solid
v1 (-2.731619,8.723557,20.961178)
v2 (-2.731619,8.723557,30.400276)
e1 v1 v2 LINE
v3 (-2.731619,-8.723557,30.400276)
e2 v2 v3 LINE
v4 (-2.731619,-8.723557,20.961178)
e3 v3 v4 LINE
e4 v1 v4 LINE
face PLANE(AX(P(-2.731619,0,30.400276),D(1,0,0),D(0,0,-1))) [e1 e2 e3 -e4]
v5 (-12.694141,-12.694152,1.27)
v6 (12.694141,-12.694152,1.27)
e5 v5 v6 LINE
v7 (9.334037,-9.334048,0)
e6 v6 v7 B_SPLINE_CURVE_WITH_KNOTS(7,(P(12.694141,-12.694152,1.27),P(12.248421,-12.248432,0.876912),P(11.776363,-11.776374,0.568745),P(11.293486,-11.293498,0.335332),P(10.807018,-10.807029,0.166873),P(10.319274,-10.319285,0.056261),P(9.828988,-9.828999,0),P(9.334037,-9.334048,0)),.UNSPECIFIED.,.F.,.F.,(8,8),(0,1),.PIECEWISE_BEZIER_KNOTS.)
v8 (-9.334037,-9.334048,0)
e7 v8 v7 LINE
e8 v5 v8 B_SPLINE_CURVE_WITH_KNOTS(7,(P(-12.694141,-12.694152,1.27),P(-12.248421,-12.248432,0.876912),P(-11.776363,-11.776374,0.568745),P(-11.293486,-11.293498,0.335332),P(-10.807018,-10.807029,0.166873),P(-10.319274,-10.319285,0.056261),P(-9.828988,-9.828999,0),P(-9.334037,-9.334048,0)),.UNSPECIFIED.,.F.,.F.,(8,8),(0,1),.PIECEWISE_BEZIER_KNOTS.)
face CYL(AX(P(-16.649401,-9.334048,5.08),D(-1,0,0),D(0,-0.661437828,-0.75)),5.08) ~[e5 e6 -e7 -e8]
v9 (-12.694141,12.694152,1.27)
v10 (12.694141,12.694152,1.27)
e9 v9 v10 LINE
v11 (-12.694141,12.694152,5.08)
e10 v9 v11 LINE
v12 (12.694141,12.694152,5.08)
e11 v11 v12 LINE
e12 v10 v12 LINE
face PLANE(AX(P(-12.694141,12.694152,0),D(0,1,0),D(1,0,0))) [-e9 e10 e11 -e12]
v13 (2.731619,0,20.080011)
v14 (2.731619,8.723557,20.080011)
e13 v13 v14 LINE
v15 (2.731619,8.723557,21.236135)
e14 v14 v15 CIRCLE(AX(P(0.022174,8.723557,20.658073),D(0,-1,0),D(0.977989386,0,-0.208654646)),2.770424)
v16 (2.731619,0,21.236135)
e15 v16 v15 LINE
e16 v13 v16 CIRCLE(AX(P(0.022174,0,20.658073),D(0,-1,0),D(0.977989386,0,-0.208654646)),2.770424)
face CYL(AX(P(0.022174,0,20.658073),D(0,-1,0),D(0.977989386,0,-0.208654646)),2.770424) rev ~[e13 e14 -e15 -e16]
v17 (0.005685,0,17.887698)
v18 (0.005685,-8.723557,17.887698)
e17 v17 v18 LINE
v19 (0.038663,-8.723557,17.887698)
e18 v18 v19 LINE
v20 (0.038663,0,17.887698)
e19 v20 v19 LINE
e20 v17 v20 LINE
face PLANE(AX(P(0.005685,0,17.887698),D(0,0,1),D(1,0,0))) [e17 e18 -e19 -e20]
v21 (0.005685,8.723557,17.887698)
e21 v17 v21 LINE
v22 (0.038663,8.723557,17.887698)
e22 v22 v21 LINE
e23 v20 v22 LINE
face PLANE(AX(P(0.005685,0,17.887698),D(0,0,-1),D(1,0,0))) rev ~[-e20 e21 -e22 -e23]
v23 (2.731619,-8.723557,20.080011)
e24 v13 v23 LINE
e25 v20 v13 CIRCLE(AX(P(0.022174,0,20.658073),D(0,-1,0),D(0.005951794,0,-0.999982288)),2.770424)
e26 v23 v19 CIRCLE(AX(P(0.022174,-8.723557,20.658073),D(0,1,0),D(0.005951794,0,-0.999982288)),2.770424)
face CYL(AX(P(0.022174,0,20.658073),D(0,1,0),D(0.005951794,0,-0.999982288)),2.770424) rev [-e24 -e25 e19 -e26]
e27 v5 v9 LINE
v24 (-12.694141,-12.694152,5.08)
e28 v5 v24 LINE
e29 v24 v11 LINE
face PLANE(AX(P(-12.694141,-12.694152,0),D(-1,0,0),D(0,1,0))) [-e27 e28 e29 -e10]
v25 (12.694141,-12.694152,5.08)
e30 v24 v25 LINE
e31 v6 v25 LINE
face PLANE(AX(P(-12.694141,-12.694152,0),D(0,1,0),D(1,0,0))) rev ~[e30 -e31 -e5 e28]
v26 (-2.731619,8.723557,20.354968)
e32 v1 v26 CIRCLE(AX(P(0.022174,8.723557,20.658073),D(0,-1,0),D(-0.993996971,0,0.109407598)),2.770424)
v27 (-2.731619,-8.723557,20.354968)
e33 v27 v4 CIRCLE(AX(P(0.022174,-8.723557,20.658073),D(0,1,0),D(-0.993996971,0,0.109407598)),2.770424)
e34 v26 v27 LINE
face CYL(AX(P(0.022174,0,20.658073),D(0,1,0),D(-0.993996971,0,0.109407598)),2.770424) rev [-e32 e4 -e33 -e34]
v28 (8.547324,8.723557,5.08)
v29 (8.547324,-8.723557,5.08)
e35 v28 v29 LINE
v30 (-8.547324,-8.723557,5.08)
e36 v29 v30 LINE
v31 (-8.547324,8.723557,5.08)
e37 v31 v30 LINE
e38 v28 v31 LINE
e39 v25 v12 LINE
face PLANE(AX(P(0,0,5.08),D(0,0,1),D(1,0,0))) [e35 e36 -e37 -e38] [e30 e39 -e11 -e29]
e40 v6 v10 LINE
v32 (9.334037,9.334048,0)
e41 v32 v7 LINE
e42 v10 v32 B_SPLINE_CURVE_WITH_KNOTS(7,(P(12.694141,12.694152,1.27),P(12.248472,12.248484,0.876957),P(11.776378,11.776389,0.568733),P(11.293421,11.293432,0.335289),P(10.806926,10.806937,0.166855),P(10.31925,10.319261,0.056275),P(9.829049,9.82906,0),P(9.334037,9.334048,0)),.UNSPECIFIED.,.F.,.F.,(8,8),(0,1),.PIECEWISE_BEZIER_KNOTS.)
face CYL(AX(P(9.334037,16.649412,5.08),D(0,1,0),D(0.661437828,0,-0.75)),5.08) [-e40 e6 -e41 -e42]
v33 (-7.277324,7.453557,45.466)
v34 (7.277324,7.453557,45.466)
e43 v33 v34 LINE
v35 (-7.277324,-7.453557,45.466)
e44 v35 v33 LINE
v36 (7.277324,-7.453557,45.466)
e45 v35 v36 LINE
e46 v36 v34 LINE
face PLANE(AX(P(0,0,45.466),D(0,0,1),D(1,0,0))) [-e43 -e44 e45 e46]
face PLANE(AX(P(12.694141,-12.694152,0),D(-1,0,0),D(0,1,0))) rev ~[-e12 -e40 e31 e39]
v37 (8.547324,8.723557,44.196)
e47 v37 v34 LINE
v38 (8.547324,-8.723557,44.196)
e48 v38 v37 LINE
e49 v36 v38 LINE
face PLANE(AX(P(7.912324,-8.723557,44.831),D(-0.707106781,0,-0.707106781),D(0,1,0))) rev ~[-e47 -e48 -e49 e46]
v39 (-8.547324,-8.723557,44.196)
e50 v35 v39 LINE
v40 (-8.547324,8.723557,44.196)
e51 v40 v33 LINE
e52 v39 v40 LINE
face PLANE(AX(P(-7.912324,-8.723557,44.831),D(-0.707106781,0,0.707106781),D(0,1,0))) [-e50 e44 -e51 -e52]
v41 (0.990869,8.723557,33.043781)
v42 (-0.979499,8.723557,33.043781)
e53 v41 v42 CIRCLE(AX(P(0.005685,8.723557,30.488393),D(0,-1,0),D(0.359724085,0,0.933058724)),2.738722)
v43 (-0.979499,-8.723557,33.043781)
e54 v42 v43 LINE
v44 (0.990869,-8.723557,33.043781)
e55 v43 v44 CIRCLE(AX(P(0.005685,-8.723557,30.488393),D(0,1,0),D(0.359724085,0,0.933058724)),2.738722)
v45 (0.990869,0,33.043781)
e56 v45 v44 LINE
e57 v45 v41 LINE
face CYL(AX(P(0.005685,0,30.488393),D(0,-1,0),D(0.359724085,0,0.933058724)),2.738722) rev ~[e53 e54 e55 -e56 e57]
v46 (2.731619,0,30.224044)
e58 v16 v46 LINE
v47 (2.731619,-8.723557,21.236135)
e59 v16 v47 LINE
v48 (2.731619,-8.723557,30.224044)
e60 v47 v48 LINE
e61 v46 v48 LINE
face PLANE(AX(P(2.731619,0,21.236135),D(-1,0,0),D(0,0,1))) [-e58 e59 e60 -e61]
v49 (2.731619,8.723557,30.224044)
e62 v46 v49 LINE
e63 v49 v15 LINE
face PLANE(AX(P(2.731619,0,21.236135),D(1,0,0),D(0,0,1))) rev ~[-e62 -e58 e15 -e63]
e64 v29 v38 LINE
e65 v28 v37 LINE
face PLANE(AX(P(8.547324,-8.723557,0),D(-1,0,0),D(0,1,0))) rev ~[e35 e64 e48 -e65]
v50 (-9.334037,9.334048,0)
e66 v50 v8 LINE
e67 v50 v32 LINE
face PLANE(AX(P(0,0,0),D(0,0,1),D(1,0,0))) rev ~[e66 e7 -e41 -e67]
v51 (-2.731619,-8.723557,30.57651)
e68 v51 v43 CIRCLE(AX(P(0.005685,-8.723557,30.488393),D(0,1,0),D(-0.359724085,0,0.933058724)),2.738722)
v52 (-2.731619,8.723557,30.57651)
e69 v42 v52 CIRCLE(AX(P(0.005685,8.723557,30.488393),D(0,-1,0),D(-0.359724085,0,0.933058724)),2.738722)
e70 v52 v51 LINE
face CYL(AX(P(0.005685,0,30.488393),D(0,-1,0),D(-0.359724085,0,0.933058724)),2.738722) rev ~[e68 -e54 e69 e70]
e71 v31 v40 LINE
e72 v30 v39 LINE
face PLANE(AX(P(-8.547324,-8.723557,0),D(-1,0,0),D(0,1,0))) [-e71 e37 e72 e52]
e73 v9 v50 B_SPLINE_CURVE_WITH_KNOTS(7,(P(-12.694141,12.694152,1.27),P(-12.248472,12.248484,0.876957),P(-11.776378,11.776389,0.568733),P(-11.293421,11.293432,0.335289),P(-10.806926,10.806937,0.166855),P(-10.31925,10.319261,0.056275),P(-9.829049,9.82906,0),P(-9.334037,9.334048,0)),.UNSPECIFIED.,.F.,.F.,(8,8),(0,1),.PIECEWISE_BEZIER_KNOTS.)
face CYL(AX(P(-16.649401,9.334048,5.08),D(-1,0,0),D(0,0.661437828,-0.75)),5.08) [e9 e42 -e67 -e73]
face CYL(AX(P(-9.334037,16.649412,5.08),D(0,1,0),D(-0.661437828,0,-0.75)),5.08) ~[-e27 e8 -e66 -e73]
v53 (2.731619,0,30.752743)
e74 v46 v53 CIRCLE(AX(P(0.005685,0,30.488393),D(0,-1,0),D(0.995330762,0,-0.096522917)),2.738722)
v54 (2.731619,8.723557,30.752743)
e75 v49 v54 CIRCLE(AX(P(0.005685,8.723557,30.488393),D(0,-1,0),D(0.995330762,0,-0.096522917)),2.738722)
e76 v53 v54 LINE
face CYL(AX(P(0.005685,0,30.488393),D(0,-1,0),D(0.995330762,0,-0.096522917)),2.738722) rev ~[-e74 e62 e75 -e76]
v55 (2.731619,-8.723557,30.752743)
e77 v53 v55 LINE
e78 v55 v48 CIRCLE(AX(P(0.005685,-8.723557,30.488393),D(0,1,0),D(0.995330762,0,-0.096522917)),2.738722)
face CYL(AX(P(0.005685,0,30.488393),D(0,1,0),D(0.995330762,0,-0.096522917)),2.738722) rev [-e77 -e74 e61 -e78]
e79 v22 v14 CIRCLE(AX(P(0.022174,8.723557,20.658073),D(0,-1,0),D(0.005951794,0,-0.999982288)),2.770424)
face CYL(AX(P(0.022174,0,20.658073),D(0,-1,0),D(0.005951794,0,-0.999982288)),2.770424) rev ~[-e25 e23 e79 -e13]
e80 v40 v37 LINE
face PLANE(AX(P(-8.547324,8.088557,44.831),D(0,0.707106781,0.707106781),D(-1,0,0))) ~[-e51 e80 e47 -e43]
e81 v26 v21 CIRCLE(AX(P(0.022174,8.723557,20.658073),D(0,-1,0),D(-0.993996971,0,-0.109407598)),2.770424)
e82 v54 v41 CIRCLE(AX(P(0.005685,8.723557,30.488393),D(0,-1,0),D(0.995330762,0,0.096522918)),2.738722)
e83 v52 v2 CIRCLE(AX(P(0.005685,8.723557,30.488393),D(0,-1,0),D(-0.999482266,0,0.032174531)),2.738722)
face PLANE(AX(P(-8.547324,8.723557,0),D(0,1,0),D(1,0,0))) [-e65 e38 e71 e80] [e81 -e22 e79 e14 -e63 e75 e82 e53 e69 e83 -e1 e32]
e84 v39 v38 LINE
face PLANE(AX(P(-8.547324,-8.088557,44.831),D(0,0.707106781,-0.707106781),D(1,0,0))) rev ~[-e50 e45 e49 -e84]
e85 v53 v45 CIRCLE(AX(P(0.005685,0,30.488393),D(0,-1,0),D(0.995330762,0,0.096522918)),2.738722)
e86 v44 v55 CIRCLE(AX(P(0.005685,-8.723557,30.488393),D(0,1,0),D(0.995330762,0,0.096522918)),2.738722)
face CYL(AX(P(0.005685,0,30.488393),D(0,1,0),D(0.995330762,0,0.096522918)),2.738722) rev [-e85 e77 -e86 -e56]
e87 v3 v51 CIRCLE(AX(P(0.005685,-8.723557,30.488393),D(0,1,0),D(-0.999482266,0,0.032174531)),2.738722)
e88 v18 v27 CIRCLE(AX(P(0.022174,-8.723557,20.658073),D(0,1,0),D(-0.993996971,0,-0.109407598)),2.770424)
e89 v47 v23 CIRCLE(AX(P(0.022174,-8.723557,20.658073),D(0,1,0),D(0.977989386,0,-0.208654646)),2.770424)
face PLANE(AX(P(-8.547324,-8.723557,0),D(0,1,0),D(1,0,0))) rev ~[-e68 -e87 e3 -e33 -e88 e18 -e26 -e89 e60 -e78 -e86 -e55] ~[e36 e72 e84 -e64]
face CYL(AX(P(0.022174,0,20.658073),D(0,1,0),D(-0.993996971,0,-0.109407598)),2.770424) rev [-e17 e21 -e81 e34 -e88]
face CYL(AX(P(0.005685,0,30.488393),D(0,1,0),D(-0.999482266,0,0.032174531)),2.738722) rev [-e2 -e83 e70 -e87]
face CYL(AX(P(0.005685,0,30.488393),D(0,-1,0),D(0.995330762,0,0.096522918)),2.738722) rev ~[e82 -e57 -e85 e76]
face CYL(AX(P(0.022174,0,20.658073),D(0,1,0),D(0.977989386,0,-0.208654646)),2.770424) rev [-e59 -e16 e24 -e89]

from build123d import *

# Parameters (mm, degrees)
F0_W        = 25.3882817924
F0_H        = 25.3883041441
F1_DEPTH    = 5.08
F2_W        = 17.0946475118
F2_H        = 17.4471139908
F3_DEPTH    = 45.466
F5_DEPTH    = 25.4
F6_DEPTH    = 25.4
F7_SIZE     = 1.27
F8_SIZE     = 1.27
F9_T1_DEPTH = 33.2988026177
F9_T3_DEPTH = 33.2988249694


# Not quite as in the source:
# - a fillet or chamfer that OpenCascade refuses, or shapes differently, is made with other operations: its cross-section is extruded or revolved along the edge and cut away or added


with BuildPart() as f1:
    # F0 (on Top) → F1 (new body)
    with BuildSketch(Plane.XY):
        Rectangle(F0_W, F0_H)
    extrude(amount=F1_DEPTH)

    # F2 (on Top) → F3 (join)
    with BuildSketch(Plane.XY):
        Rectangle(F2_W, F2_H)
    extrude(amount=F3_DEPTH)

    # F4 (on Front) → F5 (cut)
    with BuildSketch(Plane.XZ):
        with BuildLine():
            ThreePointArc((-2.7316187043, 20.3549675643), (-1.8326762864, 18.6002154817), (0.0056849059, 17.8876984864))
            Line((0.0056849059, 17.8876984864), (0.0386628839, 17.8876984864))
            ThreePointArc((0.0386628839, 17.8876984864), (1.7712415134, 18.5095830103), (2.7316187043, 20.0800112066))
            Line((2.7316187043, 20.0800112066), (2.7316187043, 21.236134693))
            Line((2.7316187043, 21.236134693), (2.7316187043, 30.2240438759))
            Line((2.7316187043, 30.2240438759), (2.7316187043, 30.752742663))
            ThreePointArc((2.7316187043, 30.752742663), (2.1863530417, 32.1452825707), (0.9908690064, 33.0437812954))
            Line((0.9908690064, 33.0437812954), (-0.9794991946, 33.0437812954))
            ThreePointArc((-0.9794991946, 33.0437812954), (-2.2272694516, 32.0741140874), (-2.7316187043, 30.5765103549))
            Line((-2.7316187043, 30.5765103549), (-2.7316187043, 30.4002761841))
            Line((-2.7316187043, 30.4002761841), (-2.7316187043, 20.9611783353))
            Line((-2.7316187043, 20.9611783353), (-2.7316187043, 20.3549675643))
        make_face()
        with BuildLine():
            ThreePointArc((-2.7316187043, 20.9611783353), (-2.7482496384, 20.6580729498), (-2.7316187043, 20.3549675643))
            Line((-2.7316187043, 20.3549675643), (-2.7316187043, 20.9611783353))
        make_face()
        with BuildLine():
            Line((2.7316187043, 21.236134693), (2.7316187043, 20.0800112066))
            ThreePointArc((2.7316187043, 20.0800112066), (2.7925974282, 20.6580729498), (2.7316187043, 21.236134693))
        make_face()
        with BuildLine():
            ThreePointArc((-2.7316187043, 30.5765103549), (-2.7330366343, 30.4883932695), (-2.7316187043, 30.4002761841))
            Line((-2.7316187043, 30.4002761841), (-2.7316187043, 30.5765103549))
        make_face()
        with BuildLine():
            Line((2.7316187043, 30.752742663), (2.7316187043, 30.2240438759))
            ThreePointArc((2.7316187043, 30.2240438759), (2.7444064461, 30.4883932695), (2.7316187043, 30.752742663))
        make_face()
        with BuildLine():
            ThreePointArc((0.9908690064, 33.0437812954), (0.0056849059, 33.2271148097), (-0.9794991946, 33.0437812954))
            Line((-0.9794991946, 33.0437812954), (0.9908690064, 33.0437812954))
        make_face()
    extrude(amount=-F5_DEPTH, mode=Mode.SUBTRACT)

    # F6 (cut): a face of the model
    f6_faces = [f1.faces().sort_by_distance(p)[0] for p in [
        (0.0051043388, 0, 25.5481593175),
    ]]
    extrude(f6_faces, amount=-F6_DEPTH, mode=Mode.SUBTRACT)

    # F7
    f7_edges = [f1.edges().sort_by_distance(p)[0] for p in [
        (0, -12.694152, 0),
        (12.694141, 0, 0),
        (-12.694141, 0, 0),
        (0, 12.694152, 0),
    ]]
    chamfer(f7_edges, length=F7_SIZE)

    # F8
    f8_edges = [f1.edges().sort_by_distance(p)[0] for p in [
        (0, 8.723557, 45.466),
        (-8.547324, 0, 45.466),
        (0, -8.723557, 45.466),
        (8.547324, 0, 45.466),
    ]]
    chamfer(f8_edges, length=F8_SIZE)

    # F9: fillet of radius 5.08 on 4 edges, made by hand

    # F9_s2 → F9_t1 (cut)
    with BuildSketch(Plane.YZ.offset(-16.6494013088)):
        with BuildLine():
            ThreePointArc((-12.6941520721, 1.27), (-11.1300991312, 0.3280951188), (-9.334047907, 0))
            Line((-9.334047907, 0), (-11.4241520721, 0))
            Line((-11.4241520721, 0), (-12.6941520721, 1.27))
        make_face()
        with BuildLine():
            ThreePointArc((12.6941520721, 1.27), (11.1300991312, 0.3280951188), (9.334047907, 0))
            Line((9.334047907, 0), (11.4241520721, 0))
            Line((11.4241520721, 0), (12.6941520721, 1.27))
        make_face()
    extrude(amount=F9_T1_DEPTH, mode=Mode.SUBTRACT)

    # F9_s4 → F9_t3 (cut)
    with BuildSketch(Plane.XZ.offset(-16.6494124847)):
        with BuildLine():
            ThreePointArc((12.6941408962, 1.27), (11.1300879554, 0.3280951188), (9.3340367311, 0))
            Line((9.3340367311, 0), (11.4241408962, 0))
            Line((11.4241408962, 0), (12.6941408962, 1.27))
        make_face()
        with BuildLine():
            ThreePointArc((-12.6941408962, 1.27), (-11.1300879554, 0.3280951188), (-9.3340367311, 0))
            Line((-9.3340367311, 0), (-11.4241408962, 0))
            Line((-11.4241408962, 0), (-12.6941408962, 1.27))
        make_face()
    extrude(amount=F9_T3_DEPTH, mode=Mode.SUBTRACT)


solid = f1.part
